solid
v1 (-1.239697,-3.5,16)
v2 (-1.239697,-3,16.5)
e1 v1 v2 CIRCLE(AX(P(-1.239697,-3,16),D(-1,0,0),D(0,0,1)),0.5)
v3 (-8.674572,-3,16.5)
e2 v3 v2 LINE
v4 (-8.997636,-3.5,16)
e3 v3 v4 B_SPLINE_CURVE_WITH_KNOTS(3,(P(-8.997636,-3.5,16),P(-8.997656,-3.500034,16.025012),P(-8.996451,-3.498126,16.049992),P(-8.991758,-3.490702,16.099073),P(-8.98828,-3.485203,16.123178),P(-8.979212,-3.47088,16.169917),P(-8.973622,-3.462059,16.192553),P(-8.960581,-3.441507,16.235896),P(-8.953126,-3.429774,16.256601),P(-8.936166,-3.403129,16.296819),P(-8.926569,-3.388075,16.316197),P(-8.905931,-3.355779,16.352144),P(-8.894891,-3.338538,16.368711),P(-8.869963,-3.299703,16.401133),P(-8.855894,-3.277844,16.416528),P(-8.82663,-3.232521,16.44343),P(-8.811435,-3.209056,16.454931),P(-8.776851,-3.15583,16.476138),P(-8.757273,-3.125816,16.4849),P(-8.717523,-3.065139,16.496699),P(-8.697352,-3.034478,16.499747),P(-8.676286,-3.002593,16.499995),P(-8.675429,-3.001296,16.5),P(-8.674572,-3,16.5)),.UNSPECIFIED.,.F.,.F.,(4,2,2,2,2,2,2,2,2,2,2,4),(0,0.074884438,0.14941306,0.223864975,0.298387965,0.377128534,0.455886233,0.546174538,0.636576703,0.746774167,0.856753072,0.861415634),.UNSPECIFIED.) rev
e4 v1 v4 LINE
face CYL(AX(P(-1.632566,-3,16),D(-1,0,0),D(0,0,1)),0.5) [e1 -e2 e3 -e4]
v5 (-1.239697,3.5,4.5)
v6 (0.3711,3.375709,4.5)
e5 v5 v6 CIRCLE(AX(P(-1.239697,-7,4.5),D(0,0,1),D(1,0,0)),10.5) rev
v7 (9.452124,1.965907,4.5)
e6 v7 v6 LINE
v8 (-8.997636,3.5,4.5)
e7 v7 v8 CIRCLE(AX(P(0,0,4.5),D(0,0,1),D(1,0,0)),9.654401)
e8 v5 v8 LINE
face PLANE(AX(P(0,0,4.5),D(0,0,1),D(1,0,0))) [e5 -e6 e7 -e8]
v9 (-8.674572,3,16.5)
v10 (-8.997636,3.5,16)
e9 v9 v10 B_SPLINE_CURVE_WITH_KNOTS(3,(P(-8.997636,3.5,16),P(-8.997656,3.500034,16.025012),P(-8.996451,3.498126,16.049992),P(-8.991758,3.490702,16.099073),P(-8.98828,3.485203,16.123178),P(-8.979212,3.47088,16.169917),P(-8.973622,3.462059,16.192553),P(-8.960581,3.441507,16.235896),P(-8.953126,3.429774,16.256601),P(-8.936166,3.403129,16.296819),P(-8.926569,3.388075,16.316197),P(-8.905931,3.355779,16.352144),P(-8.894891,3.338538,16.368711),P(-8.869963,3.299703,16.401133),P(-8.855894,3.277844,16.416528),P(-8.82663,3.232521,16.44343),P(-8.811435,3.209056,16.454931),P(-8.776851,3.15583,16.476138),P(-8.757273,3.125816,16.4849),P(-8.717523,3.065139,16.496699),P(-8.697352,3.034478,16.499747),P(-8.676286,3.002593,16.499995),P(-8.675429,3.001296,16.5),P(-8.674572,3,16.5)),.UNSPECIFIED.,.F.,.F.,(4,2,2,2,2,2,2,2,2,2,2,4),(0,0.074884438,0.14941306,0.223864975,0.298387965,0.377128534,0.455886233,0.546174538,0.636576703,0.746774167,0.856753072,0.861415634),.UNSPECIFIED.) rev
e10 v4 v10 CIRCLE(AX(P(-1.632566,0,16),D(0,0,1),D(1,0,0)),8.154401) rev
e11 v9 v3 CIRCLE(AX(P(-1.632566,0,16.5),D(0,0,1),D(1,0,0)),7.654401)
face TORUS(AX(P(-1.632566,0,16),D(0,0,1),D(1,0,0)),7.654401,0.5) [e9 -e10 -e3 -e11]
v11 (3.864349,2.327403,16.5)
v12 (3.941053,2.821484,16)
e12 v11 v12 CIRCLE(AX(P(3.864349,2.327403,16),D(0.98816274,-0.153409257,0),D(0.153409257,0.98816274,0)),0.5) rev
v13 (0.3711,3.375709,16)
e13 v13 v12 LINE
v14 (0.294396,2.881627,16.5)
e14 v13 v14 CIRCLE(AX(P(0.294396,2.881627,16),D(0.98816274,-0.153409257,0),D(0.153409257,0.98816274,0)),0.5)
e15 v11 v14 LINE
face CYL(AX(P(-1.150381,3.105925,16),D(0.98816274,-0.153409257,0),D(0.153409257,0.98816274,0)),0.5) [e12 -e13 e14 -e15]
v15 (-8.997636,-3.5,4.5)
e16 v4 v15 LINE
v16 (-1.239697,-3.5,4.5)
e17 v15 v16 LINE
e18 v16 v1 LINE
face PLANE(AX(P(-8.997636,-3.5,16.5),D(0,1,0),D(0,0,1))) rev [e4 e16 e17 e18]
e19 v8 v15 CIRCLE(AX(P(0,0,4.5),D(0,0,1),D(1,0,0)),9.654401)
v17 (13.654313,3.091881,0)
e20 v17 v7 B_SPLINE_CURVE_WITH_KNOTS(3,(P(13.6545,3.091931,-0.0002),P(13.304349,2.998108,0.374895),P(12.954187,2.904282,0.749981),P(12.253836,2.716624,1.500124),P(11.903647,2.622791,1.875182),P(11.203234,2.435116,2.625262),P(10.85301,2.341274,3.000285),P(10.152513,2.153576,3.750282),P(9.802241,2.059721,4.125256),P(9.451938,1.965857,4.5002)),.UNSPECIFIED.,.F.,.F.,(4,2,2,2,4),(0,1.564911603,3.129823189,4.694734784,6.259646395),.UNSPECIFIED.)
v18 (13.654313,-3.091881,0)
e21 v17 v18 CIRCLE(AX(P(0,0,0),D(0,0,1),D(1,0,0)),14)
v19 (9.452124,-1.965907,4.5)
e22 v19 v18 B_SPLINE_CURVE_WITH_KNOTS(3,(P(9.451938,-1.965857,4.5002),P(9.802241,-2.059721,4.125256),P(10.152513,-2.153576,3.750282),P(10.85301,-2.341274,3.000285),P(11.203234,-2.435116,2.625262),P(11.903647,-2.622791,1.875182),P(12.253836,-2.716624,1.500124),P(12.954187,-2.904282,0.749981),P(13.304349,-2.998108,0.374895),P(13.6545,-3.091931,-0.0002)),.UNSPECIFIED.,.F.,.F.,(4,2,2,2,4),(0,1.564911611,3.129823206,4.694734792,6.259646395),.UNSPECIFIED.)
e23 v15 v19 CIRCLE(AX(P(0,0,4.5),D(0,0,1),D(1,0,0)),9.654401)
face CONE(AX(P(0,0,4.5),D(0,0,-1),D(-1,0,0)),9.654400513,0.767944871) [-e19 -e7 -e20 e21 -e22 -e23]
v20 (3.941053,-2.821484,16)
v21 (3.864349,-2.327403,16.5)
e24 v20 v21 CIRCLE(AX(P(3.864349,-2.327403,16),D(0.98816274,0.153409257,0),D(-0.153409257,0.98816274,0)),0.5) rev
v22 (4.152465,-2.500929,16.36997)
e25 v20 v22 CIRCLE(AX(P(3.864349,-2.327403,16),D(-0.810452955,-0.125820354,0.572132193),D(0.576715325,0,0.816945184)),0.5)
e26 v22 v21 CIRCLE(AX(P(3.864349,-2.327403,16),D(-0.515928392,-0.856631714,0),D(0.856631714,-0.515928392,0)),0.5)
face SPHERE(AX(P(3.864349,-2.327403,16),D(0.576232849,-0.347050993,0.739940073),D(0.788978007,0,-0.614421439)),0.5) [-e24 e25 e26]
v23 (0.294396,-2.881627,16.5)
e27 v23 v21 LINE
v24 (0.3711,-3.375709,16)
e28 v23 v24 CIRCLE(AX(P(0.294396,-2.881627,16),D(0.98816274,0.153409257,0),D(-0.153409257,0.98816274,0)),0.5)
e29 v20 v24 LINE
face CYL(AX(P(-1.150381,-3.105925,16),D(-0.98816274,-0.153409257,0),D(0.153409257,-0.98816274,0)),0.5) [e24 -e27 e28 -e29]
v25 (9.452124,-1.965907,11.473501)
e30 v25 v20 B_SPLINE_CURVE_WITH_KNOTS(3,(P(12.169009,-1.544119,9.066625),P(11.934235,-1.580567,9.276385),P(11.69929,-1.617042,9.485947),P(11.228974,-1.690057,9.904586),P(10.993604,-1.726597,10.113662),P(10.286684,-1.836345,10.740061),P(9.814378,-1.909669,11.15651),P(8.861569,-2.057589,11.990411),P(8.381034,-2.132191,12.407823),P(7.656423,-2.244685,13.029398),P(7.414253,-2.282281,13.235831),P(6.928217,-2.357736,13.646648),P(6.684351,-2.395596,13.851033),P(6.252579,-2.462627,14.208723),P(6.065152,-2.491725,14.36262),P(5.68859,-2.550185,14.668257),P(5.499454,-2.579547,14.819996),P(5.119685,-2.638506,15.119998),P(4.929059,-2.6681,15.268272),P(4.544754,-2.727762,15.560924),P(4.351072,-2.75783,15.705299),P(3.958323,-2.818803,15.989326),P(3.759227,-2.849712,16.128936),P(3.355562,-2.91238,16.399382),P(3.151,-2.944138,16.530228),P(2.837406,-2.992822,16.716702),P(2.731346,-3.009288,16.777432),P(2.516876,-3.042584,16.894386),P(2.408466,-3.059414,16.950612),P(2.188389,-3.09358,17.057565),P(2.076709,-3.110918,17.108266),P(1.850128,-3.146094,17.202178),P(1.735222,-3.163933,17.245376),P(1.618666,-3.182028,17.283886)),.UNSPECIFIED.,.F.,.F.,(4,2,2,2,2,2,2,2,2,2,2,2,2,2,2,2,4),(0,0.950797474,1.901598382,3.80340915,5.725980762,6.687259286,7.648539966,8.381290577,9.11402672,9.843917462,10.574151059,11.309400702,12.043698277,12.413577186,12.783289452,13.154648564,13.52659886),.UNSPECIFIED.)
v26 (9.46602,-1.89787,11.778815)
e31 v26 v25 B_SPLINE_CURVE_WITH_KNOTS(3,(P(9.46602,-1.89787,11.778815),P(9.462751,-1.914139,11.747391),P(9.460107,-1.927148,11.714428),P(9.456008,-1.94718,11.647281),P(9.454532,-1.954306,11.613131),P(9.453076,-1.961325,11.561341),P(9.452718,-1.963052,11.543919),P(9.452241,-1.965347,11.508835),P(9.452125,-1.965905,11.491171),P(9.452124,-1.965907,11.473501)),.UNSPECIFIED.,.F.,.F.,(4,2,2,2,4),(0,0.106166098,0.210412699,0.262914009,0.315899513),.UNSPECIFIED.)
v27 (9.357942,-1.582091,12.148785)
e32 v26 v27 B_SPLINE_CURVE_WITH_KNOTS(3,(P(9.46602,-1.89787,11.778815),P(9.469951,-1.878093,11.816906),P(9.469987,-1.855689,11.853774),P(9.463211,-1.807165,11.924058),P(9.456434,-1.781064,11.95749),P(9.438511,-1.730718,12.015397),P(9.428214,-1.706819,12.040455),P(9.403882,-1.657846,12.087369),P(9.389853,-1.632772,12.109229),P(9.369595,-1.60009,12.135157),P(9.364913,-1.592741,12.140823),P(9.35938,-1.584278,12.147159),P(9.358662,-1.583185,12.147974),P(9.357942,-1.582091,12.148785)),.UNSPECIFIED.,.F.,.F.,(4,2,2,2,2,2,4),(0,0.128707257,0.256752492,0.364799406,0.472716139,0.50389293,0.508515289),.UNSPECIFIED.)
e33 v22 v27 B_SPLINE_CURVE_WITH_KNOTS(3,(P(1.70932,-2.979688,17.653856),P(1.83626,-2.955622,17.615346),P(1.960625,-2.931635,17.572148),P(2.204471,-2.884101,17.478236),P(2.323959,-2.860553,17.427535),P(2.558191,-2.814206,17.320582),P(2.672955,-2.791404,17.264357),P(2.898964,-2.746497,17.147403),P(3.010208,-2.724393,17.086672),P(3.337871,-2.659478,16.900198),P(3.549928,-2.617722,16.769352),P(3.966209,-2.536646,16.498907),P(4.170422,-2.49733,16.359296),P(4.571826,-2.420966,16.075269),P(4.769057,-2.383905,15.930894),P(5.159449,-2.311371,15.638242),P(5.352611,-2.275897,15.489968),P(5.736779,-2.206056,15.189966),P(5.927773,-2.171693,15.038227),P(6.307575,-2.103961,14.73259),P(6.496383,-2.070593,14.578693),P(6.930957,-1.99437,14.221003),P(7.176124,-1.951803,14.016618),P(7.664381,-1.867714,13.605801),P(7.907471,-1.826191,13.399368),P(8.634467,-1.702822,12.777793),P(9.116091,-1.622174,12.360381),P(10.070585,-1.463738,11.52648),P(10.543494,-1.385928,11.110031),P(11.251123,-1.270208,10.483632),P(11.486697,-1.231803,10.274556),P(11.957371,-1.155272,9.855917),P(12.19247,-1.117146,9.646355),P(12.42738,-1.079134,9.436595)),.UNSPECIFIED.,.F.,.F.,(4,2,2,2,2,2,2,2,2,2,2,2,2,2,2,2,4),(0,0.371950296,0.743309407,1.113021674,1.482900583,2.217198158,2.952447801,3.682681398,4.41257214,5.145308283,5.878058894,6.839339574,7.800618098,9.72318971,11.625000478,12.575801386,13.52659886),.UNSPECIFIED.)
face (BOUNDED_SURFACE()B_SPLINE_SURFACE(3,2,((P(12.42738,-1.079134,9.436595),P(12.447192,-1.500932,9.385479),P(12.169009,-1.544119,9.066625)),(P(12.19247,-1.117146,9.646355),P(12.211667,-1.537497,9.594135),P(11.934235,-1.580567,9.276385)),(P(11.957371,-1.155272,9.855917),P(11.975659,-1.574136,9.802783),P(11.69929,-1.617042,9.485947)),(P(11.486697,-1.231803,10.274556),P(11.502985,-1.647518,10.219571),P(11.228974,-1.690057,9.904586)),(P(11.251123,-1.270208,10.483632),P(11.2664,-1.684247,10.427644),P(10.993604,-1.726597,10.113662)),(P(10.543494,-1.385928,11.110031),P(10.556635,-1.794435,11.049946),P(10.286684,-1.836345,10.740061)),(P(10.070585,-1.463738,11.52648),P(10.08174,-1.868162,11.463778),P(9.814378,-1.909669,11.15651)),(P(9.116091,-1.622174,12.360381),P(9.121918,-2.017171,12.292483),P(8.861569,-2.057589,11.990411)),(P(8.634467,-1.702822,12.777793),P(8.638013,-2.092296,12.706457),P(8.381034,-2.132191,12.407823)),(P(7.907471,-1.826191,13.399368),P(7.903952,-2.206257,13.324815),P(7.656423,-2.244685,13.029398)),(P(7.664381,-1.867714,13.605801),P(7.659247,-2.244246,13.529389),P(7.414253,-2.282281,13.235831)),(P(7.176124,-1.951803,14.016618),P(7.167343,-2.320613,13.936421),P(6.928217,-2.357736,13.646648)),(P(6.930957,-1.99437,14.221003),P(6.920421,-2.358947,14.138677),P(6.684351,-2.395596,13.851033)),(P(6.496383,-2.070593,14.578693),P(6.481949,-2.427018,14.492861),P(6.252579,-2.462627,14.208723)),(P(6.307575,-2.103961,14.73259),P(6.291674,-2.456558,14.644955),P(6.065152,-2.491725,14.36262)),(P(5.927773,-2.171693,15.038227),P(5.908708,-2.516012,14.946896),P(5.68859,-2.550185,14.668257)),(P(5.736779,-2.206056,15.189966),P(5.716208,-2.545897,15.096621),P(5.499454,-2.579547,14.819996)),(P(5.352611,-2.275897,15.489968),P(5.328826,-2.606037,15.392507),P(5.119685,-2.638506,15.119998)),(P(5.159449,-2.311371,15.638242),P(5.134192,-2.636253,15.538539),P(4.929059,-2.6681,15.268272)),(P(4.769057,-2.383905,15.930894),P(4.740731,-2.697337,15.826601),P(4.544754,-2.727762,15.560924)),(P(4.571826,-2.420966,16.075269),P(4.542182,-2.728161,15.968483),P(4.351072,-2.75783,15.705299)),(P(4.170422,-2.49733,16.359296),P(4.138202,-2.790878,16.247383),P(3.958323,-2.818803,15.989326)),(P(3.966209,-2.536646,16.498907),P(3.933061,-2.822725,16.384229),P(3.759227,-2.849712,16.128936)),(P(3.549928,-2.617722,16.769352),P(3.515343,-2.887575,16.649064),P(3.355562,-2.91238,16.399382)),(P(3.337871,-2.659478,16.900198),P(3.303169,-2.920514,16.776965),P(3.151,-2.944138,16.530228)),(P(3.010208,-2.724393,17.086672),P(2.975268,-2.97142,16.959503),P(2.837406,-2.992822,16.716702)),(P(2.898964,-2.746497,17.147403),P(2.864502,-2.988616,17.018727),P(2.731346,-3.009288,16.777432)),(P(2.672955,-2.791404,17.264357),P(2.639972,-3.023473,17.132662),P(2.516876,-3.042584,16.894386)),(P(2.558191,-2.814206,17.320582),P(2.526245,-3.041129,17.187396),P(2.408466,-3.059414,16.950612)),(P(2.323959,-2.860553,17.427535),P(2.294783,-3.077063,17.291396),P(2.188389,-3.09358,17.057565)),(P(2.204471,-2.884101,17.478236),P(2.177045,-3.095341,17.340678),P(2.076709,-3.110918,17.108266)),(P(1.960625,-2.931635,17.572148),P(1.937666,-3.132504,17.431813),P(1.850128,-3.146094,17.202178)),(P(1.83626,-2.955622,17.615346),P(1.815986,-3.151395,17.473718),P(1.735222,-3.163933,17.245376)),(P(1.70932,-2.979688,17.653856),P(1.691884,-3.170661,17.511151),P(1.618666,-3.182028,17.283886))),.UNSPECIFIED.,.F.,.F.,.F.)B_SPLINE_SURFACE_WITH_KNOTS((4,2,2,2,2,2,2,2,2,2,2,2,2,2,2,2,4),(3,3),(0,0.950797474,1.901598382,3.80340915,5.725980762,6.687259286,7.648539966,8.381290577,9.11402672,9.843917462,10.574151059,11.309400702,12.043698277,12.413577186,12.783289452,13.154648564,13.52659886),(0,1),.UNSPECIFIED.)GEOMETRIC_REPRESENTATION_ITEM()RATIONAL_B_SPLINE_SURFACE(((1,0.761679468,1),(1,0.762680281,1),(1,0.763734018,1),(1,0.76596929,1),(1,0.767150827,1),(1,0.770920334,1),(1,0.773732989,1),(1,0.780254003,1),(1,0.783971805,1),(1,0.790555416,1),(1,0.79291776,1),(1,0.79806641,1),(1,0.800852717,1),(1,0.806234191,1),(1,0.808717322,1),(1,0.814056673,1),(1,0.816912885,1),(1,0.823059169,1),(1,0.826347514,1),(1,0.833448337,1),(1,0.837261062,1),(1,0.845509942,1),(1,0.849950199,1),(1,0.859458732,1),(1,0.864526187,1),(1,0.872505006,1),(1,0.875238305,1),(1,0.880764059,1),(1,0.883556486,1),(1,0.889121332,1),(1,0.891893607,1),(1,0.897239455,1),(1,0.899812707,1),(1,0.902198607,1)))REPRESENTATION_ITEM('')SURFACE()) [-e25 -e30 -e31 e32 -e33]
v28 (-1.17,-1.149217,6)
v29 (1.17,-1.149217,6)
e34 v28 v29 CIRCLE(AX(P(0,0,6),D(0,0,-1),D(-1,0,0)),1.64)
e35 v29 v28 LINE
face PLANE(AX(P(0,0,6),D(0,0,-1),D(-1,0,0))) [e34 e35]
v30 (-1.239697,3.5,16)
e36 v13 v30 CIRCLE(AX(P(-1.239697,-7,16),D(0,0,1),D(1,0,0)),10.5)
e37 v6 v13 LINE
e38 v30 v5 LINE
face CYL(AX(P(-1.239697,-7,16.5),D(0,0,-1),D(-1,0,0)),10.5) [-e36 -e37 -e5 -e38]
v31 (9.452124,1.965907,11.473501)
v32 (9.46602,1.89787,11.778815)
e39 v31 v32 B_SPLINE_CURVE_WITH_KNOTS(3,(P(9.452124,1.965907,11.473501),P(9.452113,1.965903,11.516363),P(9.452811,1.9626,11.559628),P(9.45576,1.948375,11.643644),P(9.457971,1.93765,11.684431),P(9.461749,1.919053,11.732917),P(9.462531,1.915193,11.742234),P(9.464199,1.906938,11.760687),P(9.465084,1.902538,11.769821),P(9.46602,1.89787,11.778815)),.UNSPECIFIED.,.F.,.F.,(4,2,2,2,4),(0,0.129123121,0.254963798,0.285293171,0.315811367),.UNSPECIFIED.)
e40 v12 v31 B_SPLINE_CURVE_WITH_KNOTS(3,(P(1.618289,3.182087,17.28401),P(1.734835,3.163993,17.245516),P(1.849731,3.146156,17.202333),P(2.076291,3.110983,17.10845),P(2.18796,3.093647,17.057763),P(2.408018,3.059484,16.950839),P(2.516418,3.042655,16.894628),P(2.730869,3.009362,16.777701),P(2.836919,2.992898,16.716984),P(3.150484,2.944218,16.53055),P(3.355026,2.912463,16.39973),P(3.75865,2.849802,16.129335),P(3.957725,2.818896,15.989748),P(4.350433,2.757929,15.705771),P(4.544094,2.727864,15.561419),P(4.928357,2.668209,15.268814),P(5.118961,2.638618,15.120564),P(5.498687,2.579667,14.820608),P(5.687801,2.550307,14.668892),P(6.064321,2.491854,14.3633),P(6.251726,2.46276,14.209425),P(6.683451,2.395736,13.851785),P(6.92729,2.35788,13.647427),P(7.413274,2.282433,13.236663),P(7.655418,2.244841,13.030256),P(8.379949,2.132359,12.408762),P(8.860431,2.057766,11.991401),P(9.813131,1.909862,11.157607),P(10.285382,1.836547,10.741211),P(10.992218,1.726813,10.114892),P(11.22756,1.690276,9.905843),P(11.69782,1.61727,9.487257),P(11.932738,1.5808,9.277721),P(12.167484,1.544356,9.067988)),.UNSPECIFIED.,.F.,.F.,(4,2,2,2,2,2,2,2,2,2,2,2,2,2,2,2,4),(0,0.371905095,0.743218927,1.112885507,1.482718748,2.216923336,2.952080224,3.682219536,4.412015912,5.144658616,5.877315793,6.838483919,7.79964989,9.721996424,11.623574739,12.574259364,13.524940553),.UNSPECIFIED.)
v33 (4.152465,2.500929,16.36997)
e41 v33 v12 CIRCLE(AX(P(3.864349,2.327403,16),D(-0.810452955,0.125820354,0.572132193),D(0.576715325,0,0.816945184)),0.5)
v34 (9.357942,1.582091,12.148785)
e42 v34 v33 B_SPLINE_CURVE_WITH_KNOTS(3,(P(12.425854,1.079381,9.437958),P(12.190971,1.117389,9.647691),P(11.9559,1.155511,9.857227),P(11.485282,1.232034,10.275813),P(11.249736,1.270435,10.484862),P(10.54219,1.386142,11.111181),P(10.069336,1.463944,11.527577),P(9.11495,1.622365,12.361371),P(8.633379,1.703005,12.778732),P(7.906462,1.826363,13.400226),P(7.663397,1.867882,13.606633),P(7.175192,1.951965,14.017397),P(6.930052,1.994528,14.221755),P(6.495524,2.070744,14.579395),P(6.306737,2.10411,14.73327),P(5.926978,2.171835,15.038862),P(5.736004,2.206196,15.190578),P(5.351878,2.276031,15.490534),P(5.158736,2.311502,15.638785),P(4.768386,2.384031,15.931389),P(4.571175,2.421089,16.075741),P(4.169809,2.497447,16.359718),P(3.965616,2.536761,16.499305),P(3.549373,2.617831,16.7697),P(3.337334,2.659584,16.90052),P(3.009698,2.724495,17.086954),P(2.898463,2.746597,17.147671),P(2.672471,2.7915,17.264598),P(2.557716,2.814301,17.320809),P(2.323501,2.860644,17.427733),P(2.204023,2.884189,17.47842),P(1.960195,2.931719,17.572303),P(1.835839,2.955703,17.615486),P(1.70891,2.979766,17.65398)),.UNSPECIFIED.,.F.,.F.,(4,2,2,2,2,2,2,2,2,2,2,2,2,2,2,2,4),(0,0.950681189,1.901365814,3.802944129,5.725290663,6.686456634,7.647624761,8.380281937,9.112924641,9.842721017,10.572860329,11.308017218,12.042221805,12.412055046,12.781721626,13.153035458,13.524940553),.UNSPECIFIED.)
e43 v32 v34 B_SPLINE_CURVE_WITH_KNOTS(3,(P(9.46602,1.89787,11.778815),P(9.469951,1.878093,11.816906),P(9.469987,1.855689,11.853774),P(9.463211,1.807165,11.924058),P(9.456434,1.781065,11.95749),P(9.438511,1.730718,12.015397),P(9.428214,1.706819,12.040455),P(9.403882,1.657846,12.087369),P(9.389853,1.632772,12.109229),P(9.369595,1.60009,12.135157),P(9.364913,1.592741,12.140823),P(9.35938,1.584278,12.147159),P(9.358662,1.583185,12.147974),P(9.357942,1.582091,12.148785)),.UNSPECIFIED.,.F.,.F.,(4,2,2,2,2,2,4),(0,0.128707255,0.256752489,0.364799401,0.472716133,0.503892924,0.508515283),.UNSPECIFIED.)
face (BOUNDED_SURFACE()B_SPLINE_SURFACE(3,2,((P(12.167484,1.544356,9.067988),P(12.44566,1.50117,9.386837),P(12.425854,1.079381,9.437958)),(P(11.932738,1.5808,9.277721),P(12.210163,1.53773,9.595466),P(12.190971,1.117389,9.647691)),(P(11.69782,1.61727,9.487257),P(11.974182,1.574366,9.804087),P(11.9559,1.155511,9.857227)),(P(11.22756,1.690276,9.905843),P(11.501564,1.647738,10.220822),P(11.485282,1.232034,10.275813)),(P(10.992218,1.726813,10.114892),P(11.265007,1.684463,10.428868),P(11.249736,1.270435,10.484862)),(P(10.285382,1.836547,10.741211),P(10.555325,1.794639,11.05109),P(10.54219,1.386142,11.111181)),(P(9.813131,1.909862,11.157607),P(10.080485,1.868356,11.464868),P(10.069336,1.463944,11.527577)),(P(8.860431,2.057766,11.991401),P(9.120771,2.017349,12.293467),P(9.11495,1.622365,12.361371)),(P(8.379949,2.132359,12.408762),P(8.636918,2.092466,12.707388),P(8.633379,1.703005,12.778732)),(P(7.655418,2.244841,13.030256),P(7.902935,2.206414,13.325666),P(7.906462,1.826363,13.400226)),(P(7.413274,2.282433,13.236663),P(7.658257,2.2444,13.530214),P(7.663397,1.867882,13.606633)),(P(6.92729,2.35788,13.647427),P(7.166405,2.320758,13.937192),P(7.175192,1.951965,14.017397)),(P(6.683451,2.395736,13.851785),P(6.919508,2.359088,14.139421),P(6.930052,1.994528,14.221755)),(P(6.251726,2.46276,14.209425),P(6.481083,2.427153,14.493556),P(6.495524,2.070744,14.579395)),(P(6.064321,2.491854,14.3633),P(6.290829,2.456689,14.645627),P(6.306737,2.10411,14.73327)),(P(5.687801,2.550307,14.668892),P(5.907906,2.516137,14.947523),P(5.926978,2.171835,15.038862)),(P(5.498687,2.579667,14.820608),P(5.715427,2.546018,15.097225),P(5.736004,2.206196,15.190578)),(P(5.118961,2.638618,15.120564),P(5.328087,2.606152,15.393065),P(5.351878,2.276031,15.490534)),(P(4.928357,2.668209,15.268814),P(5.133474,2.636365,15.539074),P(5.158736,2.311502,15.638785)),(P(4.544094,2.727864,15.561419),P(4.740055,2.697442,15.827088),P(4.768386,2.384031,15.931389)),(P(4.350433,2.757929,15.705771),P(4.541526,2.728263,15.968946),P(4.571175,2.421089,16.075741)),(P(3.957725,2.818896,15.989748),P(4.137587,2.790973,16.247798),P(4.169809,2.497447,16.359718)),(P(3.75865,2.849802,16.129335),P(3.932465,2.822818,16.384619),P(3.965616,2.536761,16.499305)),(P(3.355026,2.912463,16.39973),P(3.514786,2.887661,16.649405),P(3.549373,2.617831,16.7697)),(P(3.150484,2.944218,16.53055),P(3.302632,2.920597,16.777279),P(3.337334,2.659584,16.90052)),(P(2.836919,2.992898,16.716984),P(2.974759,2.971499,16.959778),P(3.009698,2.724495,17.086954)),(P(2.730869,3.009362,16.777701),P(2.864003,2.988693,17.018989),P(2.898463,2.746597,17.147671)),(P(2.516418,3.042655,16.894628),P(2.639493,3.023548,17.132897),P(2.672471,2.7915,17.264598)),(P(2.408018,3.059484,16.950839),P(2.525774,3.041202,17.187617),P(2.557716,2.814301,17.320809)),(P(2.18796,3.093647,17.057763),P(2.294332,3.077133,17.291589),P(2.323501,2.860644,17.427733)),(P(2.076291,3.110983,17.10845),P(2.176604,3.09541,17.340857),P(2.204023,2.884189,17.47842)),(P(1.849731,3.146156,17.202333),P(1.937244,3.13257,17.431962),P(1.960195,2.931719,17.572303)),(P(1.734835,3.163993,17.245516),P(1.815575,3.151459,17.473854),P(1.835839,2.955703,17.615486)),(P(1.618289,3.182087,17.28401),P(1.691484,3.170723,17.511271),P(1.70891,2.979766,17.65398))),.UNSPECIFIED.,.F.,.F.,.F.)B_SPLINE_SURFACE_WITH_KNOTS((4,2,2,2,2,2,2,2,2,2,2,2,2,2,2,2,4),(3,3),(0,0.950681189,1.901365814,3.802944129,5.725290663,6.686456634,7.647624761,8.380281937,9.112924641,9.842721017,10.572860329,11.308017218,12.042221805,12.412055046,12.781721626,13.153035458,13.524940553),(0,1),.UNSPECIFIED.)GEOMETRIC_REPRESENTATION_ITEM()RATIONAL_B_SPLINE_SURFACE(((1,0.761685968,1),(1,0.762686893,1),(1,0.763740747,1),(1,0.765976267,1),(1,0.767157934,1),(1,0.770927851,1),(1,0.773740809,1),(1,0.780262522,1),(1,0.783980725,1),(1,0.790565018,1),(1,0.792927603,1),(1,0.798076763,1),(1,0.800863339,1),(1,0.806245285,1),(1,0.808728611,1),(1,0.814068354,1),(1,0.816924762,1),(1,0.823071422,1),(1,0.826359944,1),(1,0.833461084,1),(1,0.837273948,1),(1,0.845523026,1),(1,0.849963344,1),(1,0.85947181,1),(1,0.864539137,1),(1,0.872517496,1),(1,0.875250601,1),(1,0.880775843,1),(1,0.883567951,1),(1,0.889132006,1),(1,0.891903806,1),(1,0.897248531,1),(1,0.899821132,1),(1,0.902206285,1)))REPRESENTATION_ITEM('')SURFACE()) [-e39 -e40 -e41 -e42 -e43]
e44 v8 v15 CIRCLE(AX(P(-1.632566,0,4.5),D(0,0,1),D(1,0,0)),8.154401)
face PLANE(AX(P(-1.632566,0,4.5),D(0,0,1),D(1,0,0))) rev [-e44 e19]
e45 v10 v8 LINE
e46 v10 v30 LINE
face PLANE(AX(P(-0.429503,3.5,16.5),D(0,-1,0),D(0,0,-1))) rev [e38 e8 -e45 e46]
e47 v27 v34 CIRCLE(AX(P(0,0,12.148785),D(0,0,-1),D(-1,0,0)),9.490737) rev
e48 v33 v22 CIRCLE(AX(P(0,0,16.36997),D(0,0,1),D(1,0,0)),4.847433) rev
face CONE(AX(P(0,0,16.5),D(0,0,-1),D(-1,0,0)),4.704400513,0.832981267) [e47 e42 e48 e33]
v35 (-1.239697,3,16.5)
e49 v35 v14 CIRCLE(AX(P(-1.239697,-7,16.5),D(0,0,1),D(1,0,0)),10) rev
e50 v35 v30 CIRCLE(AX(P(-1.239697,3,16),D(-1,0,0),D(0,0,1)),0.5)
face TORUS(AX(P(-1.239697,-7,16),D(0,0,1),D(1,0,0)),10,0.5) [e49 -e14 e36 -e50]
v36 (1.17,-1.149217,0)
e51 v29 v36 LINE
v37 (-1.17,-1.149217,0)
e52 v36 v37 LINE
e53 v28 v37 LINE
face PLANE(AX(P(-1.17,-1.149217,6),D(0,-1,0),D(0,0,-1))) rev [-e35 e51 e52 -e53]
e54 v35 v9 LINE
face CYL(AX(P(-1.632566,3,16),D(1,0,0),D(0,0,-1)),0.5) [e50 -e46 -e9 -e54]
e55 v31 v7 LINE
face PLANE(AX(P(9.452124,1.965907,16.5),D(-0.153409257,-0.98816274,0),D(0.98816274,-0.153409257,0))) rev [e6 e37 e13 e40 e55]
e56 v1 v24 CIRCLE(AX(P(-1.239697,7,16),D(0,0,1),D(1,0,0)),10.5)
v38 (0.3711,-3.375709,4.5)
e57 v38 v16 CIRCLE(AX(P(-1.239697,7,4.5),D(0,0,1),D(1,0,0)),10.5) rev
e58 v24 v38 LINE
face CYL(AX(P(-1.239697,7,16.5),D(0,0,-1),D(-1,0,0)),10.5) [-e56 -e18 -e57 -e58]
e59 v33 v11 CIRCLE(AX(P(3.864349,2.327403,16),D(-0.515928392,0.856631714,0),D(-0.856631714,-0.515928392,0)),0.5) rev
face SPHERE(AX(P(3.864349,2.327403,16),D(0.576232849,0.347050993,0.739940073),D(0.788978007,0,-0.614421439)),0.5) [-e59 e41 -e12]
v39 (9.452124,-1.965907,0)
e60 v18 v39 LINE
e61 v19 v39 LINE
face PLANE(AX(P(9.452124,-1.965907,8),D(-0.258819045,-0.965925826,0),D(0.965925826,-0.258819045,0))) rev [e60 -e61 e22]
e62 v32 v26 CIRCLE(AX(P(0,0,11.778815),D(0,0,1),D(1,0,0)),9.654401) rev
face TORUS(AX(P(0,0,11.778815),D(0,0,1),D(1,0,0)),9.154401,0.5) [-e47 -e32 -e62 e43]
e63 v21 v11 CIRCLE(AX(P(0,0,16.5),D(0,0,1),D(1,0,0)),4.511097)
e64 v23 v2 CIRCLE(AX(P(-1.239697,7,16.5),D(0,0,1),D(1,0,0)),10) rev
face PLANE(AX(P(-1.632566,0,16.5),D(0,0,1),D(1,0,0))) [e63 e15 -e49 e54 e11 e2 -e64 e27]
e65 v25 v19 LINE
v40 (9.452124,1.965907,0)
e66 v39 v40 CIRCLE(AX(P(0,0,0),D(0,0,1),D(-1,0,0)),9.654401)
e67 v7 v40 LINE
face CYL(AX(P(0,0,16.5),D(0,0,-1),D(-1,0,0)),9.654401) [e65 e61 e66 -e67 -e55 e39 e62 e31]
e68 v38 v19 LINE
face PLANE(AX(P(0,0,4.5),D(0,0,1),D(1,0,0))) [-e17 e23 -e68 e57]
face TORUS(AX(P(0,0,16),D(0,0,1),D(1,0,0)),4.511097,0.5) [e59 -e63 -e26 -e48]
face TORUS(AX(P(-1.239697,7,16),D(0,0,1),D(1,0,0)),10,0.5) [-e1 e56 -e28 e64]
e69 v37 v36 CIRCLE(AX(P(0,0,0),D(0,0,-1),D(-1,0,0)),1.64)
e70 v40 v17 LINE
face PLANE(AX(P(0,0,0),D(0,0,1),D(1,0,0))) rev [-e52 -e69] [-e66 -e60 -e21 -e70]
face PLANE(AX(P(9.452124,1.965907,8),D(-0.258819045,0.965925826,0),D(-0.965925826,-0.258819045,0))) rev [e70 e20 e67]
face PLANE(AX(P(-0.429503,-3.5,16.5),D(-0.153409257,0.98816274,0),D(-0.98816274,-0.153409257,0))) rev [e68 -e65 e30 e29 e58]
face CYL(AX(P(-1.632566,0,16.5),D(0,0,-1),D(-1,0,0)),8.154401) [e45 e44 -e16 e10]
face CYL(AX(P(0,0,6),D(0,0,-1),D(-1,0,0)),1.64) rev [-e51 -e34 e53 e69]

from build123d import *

# Parameters (mm, degrees)
SZKIC1_R                    = 14
DODANIE_WYCI_GNI_CIE1_DEPTH = 4.5
SFAZOWANIE2_SIZE2           = 4.345599487
SFAZOWANIE2_SIZE            = 4.5
DODANIE_WYCI_GNI_CIE5_DEPTH = 12
WYTNIJ_WYCI_GNI_CIE2_DEPTH  = 8
SFAZOWANIE4_SIZE            = 4.5
SFAZOWANIE4_SIZE2           = 4.95
ZAOKR_GLENIE2_R             = 0.5
ZAOKR_GLENIE3_R             = 10.5
WYTNIJ_WYCI_GNI_CIE3_DEPTH  = 6


# Some blends are built 0.0001 mm under size
with BuildPart() as part:
    # Szkic1 → Dodanie-wyciągnięcie1 (new body)
    with BuildSketch(Plane.XY):
        Circle(SZKIC1_R)
    extrude(amount=DODANIE_WYCI_GNI_CIE1_DEPTH)

    # Sfazowanie2
    sfazowanie2_edges = [part.edges().sort_by_distance(p)[0] for p in [
        (-14, 0, 4.5),
    ]]
    sfazowanie2_side = [part.faces().sort_by_distance(p)[0] for p in [
        (-14, 0, 4.41308801),
    ]]
    chamfer(sfazowanie2_edges, length=SFAZOWANIE2_SIZE - 0.0001, length2=SFAZOWANIE2_SIZE2 - 0.0001, reference=sfazowanie2_side[0])  # a hair under: the kernel refuses the full size

    # Szkic2 → Dodanie-wyciągnięcie5 (add)
    with BuildSketch(Plane.XY.offset(4.5)):
        with BuildLine():
            Line((9.452124483, 1.965907434), (-0.429502914, 3.5))
            Line((-0.429502914, 3.5), (-8.99763576, 3.5))
            ThreePointArc((-8.99763576, 3.5), (-9.786966842, 0), (-8.99763576, -3.5))
            Line((-8.99763576, -3.5), (-0.429502914, -3.5))
            Line((-0.429502914, -3.5), (9.452124483, -1.965907434))
            ThreePointArc((9.452124483, -1.965907434), (9.654400513, 0), (9.452124483, 1.965907434))
        make_face()
    extrude(amount=DODANIE_WYCI_GNI_CIE5_DEPTH)

    # Szkic8 → Wytnij-wyciągnięcie2 (cut)
    with BuildSketch(Plane(origin=(0, 0, 0), x_dir=(-1, 0, 0), z_dir=(0, 0, -1))):
        with BuildLine():
            Line((-9.452124483, 1.965907434), (-13.654313406, 3.091880562))
            ThreePointArc((-13.654313406, 3.091880562), (-14.042737349, 0), (-13.654313406, -3.091880562))
            Line((-13.654313406, -3.091880562), (-9.452124483, -1.965907434))
            ThreePointArc((-9.452124483, -1.965907434), (-9.654400513, 0), (-9.452124483, 1.965907434))
        make_face()
    extrude(amount=-WYTNIJ_WYCI_GNI_CIE2_DEPTH, mode=Mode.SUBTRACT)

    # Sfazowanie4
    sfazowanie4_edges = [part.edges().sort_by_distance(p)[0] for p in [
        (9.654400513, 0, 16.5),
    ]]
    sfazowanie4_side = [part.faces().sort_by_distance(p)[0] for p in [
        (9.654400513, 0, 8.25),
    ]]
    chamfer(sfazowanie4_edges, length=SFAZOWANIE4_SIZE, length2=SFAZOWANIE4_SIZE2, reference=sfazowanie4_side[0])

    # Zaokrąglenie2
    zaokr_glenie2_edges = [part.edges().sort_by_distance(p)[0] for p in [
        (-9.786966842, 0, 16.5),
        (-4.713569337, -3.5, 16.5),
        (1.655695985, -3.17627922, 16.5),
        (-4.713569337, 3.5, 16.5),
        (1.655695985, 3.17627922, 16.5),
        (4.704400513, 0, 16.5),
        (6.663505686, 2.398832011, 14.338418901),
        (9.654400513, 0, 12),
        (6.663505686, -2.398832011, 14.338418901),
    ]]
    fillet(zaokr_glenie2_edges, radius=ZAOKR_GLENIE2_R)

    # Zaokrąglenie3
    # the kernel refuses this fillet: 10.5 mm, written as the material it takes off along each edge
    with BuildSketch(Plane(origin=(-1.239696749, -7, 16.5), x_dir=(0.15340925660527832, 0.9881627396273429, 0), z_dir=(0.9881627396273429, -0.15340925660527832, 0))) as zaokr_glenie3_piece_1:
        with BuildLine():
            CenterArc((10, -0.5), 0.5, 0, 90)
            Line((10.5, -0.5), (10.5, 0))
            Line((10.5, 0), (10, 0))
        make_face()
    revolve(axis=Axis((-1.239696749, -7, 16.5), (0, 0, 1)), revolution_arc=8.824549996, mode=Mode.SUBTRACT)
    with BuildSketch(Plane(origin=(-1.239696749, 7, 16.5), x_dir=(0, -1, 0), z_dir=(-1, 0, 0))) as zaokr_glenie3_piece_2:
        with BuildLine():
            CenterArc((10, -0.5), 0.5, 0, 90)
            Line((10.5, -0.5), (10.5, 0))
            Line((10.5, 0), (10, 0))
        make_face()
    revolve(axis=Axis((-1.239696749, 7, 16.5), (0, 0, 1)), revolution_arc=8.824549996, mode=Mode.SUBTRACT)
    with BuildSketch(Plane(origin=(-0.429502914, -3.5, 4.5), x_dir=(0.9881627396273429, 0.15340925660527846, 0), z_dir=(0, 0, 1))) as zaokr_glenie3_piece_3:
        with BuildLine():
            CenterArc((ZAOKR_GLENIE3_R * 0.0771613176062, ZAOKR_GLENIE3_R), ZAOKR_GLENIE3_R, 261.175450004, 8.824549996)
            Line((-ZAOKR_GLENIE3_R * 0.076247938999, ZAOKR_GLENIE3_R * 0.0118372603727), (0, 0))
            Line((0, 0), (ZAOKR_GLENIE3_R * 0.0771613176062, 0))
        make_face()
    extrude(amount=12, mode=Mode.SUBTRACT)
    with BuildSketch(Plane(origin=(-0.429502914, 3.5, 4.5), x_dir=(0.9881627396273429, -0.15340925660527815, 0), z_dir=(0, 0, 1))) as zaokr_glenie3_piece_4:
        with BuildLine():
            CenterArc((ZAOKR_GLENIE3_R * 0.0771613176062, -ZAOKR_GLENIE3_R), ZAOKR_GLENIE3_R, 90, 8.824549996)
            Line((-ZAOKR_GLENIE3_R * 0.076247938999, -ZAOKR_GLENIE3_R * 0.0118372603727), (0, 0))
            Line((0, 0), (ZAOKR_GLENIE3_R * 0.0771613176062, 0))
        make_face()
    extrude(amount=12, mode=Mode.SUBTRACT)

    # Szkic9 → Wytnij-wyciągnięcie3 (cut)
    with BuildSketch(Plane(origin=(0, 0, 0), x_dir=(-1, 0, 0), z_dir=(0, 0, -1))):
        with BuildLine():
            Line((1.17, -1.149217125), (-1.17, -1.149217125))
            ThreePointArc((-1.17, -1.149217125), (0, 1.64), (1.17, -1.149217125))
        make_face()
    extrude(amount=-WYTNIJ_WYCI_GNI_CIE3_DEPTH, mode=Mode.SUBTRACT)


solid = part.part
